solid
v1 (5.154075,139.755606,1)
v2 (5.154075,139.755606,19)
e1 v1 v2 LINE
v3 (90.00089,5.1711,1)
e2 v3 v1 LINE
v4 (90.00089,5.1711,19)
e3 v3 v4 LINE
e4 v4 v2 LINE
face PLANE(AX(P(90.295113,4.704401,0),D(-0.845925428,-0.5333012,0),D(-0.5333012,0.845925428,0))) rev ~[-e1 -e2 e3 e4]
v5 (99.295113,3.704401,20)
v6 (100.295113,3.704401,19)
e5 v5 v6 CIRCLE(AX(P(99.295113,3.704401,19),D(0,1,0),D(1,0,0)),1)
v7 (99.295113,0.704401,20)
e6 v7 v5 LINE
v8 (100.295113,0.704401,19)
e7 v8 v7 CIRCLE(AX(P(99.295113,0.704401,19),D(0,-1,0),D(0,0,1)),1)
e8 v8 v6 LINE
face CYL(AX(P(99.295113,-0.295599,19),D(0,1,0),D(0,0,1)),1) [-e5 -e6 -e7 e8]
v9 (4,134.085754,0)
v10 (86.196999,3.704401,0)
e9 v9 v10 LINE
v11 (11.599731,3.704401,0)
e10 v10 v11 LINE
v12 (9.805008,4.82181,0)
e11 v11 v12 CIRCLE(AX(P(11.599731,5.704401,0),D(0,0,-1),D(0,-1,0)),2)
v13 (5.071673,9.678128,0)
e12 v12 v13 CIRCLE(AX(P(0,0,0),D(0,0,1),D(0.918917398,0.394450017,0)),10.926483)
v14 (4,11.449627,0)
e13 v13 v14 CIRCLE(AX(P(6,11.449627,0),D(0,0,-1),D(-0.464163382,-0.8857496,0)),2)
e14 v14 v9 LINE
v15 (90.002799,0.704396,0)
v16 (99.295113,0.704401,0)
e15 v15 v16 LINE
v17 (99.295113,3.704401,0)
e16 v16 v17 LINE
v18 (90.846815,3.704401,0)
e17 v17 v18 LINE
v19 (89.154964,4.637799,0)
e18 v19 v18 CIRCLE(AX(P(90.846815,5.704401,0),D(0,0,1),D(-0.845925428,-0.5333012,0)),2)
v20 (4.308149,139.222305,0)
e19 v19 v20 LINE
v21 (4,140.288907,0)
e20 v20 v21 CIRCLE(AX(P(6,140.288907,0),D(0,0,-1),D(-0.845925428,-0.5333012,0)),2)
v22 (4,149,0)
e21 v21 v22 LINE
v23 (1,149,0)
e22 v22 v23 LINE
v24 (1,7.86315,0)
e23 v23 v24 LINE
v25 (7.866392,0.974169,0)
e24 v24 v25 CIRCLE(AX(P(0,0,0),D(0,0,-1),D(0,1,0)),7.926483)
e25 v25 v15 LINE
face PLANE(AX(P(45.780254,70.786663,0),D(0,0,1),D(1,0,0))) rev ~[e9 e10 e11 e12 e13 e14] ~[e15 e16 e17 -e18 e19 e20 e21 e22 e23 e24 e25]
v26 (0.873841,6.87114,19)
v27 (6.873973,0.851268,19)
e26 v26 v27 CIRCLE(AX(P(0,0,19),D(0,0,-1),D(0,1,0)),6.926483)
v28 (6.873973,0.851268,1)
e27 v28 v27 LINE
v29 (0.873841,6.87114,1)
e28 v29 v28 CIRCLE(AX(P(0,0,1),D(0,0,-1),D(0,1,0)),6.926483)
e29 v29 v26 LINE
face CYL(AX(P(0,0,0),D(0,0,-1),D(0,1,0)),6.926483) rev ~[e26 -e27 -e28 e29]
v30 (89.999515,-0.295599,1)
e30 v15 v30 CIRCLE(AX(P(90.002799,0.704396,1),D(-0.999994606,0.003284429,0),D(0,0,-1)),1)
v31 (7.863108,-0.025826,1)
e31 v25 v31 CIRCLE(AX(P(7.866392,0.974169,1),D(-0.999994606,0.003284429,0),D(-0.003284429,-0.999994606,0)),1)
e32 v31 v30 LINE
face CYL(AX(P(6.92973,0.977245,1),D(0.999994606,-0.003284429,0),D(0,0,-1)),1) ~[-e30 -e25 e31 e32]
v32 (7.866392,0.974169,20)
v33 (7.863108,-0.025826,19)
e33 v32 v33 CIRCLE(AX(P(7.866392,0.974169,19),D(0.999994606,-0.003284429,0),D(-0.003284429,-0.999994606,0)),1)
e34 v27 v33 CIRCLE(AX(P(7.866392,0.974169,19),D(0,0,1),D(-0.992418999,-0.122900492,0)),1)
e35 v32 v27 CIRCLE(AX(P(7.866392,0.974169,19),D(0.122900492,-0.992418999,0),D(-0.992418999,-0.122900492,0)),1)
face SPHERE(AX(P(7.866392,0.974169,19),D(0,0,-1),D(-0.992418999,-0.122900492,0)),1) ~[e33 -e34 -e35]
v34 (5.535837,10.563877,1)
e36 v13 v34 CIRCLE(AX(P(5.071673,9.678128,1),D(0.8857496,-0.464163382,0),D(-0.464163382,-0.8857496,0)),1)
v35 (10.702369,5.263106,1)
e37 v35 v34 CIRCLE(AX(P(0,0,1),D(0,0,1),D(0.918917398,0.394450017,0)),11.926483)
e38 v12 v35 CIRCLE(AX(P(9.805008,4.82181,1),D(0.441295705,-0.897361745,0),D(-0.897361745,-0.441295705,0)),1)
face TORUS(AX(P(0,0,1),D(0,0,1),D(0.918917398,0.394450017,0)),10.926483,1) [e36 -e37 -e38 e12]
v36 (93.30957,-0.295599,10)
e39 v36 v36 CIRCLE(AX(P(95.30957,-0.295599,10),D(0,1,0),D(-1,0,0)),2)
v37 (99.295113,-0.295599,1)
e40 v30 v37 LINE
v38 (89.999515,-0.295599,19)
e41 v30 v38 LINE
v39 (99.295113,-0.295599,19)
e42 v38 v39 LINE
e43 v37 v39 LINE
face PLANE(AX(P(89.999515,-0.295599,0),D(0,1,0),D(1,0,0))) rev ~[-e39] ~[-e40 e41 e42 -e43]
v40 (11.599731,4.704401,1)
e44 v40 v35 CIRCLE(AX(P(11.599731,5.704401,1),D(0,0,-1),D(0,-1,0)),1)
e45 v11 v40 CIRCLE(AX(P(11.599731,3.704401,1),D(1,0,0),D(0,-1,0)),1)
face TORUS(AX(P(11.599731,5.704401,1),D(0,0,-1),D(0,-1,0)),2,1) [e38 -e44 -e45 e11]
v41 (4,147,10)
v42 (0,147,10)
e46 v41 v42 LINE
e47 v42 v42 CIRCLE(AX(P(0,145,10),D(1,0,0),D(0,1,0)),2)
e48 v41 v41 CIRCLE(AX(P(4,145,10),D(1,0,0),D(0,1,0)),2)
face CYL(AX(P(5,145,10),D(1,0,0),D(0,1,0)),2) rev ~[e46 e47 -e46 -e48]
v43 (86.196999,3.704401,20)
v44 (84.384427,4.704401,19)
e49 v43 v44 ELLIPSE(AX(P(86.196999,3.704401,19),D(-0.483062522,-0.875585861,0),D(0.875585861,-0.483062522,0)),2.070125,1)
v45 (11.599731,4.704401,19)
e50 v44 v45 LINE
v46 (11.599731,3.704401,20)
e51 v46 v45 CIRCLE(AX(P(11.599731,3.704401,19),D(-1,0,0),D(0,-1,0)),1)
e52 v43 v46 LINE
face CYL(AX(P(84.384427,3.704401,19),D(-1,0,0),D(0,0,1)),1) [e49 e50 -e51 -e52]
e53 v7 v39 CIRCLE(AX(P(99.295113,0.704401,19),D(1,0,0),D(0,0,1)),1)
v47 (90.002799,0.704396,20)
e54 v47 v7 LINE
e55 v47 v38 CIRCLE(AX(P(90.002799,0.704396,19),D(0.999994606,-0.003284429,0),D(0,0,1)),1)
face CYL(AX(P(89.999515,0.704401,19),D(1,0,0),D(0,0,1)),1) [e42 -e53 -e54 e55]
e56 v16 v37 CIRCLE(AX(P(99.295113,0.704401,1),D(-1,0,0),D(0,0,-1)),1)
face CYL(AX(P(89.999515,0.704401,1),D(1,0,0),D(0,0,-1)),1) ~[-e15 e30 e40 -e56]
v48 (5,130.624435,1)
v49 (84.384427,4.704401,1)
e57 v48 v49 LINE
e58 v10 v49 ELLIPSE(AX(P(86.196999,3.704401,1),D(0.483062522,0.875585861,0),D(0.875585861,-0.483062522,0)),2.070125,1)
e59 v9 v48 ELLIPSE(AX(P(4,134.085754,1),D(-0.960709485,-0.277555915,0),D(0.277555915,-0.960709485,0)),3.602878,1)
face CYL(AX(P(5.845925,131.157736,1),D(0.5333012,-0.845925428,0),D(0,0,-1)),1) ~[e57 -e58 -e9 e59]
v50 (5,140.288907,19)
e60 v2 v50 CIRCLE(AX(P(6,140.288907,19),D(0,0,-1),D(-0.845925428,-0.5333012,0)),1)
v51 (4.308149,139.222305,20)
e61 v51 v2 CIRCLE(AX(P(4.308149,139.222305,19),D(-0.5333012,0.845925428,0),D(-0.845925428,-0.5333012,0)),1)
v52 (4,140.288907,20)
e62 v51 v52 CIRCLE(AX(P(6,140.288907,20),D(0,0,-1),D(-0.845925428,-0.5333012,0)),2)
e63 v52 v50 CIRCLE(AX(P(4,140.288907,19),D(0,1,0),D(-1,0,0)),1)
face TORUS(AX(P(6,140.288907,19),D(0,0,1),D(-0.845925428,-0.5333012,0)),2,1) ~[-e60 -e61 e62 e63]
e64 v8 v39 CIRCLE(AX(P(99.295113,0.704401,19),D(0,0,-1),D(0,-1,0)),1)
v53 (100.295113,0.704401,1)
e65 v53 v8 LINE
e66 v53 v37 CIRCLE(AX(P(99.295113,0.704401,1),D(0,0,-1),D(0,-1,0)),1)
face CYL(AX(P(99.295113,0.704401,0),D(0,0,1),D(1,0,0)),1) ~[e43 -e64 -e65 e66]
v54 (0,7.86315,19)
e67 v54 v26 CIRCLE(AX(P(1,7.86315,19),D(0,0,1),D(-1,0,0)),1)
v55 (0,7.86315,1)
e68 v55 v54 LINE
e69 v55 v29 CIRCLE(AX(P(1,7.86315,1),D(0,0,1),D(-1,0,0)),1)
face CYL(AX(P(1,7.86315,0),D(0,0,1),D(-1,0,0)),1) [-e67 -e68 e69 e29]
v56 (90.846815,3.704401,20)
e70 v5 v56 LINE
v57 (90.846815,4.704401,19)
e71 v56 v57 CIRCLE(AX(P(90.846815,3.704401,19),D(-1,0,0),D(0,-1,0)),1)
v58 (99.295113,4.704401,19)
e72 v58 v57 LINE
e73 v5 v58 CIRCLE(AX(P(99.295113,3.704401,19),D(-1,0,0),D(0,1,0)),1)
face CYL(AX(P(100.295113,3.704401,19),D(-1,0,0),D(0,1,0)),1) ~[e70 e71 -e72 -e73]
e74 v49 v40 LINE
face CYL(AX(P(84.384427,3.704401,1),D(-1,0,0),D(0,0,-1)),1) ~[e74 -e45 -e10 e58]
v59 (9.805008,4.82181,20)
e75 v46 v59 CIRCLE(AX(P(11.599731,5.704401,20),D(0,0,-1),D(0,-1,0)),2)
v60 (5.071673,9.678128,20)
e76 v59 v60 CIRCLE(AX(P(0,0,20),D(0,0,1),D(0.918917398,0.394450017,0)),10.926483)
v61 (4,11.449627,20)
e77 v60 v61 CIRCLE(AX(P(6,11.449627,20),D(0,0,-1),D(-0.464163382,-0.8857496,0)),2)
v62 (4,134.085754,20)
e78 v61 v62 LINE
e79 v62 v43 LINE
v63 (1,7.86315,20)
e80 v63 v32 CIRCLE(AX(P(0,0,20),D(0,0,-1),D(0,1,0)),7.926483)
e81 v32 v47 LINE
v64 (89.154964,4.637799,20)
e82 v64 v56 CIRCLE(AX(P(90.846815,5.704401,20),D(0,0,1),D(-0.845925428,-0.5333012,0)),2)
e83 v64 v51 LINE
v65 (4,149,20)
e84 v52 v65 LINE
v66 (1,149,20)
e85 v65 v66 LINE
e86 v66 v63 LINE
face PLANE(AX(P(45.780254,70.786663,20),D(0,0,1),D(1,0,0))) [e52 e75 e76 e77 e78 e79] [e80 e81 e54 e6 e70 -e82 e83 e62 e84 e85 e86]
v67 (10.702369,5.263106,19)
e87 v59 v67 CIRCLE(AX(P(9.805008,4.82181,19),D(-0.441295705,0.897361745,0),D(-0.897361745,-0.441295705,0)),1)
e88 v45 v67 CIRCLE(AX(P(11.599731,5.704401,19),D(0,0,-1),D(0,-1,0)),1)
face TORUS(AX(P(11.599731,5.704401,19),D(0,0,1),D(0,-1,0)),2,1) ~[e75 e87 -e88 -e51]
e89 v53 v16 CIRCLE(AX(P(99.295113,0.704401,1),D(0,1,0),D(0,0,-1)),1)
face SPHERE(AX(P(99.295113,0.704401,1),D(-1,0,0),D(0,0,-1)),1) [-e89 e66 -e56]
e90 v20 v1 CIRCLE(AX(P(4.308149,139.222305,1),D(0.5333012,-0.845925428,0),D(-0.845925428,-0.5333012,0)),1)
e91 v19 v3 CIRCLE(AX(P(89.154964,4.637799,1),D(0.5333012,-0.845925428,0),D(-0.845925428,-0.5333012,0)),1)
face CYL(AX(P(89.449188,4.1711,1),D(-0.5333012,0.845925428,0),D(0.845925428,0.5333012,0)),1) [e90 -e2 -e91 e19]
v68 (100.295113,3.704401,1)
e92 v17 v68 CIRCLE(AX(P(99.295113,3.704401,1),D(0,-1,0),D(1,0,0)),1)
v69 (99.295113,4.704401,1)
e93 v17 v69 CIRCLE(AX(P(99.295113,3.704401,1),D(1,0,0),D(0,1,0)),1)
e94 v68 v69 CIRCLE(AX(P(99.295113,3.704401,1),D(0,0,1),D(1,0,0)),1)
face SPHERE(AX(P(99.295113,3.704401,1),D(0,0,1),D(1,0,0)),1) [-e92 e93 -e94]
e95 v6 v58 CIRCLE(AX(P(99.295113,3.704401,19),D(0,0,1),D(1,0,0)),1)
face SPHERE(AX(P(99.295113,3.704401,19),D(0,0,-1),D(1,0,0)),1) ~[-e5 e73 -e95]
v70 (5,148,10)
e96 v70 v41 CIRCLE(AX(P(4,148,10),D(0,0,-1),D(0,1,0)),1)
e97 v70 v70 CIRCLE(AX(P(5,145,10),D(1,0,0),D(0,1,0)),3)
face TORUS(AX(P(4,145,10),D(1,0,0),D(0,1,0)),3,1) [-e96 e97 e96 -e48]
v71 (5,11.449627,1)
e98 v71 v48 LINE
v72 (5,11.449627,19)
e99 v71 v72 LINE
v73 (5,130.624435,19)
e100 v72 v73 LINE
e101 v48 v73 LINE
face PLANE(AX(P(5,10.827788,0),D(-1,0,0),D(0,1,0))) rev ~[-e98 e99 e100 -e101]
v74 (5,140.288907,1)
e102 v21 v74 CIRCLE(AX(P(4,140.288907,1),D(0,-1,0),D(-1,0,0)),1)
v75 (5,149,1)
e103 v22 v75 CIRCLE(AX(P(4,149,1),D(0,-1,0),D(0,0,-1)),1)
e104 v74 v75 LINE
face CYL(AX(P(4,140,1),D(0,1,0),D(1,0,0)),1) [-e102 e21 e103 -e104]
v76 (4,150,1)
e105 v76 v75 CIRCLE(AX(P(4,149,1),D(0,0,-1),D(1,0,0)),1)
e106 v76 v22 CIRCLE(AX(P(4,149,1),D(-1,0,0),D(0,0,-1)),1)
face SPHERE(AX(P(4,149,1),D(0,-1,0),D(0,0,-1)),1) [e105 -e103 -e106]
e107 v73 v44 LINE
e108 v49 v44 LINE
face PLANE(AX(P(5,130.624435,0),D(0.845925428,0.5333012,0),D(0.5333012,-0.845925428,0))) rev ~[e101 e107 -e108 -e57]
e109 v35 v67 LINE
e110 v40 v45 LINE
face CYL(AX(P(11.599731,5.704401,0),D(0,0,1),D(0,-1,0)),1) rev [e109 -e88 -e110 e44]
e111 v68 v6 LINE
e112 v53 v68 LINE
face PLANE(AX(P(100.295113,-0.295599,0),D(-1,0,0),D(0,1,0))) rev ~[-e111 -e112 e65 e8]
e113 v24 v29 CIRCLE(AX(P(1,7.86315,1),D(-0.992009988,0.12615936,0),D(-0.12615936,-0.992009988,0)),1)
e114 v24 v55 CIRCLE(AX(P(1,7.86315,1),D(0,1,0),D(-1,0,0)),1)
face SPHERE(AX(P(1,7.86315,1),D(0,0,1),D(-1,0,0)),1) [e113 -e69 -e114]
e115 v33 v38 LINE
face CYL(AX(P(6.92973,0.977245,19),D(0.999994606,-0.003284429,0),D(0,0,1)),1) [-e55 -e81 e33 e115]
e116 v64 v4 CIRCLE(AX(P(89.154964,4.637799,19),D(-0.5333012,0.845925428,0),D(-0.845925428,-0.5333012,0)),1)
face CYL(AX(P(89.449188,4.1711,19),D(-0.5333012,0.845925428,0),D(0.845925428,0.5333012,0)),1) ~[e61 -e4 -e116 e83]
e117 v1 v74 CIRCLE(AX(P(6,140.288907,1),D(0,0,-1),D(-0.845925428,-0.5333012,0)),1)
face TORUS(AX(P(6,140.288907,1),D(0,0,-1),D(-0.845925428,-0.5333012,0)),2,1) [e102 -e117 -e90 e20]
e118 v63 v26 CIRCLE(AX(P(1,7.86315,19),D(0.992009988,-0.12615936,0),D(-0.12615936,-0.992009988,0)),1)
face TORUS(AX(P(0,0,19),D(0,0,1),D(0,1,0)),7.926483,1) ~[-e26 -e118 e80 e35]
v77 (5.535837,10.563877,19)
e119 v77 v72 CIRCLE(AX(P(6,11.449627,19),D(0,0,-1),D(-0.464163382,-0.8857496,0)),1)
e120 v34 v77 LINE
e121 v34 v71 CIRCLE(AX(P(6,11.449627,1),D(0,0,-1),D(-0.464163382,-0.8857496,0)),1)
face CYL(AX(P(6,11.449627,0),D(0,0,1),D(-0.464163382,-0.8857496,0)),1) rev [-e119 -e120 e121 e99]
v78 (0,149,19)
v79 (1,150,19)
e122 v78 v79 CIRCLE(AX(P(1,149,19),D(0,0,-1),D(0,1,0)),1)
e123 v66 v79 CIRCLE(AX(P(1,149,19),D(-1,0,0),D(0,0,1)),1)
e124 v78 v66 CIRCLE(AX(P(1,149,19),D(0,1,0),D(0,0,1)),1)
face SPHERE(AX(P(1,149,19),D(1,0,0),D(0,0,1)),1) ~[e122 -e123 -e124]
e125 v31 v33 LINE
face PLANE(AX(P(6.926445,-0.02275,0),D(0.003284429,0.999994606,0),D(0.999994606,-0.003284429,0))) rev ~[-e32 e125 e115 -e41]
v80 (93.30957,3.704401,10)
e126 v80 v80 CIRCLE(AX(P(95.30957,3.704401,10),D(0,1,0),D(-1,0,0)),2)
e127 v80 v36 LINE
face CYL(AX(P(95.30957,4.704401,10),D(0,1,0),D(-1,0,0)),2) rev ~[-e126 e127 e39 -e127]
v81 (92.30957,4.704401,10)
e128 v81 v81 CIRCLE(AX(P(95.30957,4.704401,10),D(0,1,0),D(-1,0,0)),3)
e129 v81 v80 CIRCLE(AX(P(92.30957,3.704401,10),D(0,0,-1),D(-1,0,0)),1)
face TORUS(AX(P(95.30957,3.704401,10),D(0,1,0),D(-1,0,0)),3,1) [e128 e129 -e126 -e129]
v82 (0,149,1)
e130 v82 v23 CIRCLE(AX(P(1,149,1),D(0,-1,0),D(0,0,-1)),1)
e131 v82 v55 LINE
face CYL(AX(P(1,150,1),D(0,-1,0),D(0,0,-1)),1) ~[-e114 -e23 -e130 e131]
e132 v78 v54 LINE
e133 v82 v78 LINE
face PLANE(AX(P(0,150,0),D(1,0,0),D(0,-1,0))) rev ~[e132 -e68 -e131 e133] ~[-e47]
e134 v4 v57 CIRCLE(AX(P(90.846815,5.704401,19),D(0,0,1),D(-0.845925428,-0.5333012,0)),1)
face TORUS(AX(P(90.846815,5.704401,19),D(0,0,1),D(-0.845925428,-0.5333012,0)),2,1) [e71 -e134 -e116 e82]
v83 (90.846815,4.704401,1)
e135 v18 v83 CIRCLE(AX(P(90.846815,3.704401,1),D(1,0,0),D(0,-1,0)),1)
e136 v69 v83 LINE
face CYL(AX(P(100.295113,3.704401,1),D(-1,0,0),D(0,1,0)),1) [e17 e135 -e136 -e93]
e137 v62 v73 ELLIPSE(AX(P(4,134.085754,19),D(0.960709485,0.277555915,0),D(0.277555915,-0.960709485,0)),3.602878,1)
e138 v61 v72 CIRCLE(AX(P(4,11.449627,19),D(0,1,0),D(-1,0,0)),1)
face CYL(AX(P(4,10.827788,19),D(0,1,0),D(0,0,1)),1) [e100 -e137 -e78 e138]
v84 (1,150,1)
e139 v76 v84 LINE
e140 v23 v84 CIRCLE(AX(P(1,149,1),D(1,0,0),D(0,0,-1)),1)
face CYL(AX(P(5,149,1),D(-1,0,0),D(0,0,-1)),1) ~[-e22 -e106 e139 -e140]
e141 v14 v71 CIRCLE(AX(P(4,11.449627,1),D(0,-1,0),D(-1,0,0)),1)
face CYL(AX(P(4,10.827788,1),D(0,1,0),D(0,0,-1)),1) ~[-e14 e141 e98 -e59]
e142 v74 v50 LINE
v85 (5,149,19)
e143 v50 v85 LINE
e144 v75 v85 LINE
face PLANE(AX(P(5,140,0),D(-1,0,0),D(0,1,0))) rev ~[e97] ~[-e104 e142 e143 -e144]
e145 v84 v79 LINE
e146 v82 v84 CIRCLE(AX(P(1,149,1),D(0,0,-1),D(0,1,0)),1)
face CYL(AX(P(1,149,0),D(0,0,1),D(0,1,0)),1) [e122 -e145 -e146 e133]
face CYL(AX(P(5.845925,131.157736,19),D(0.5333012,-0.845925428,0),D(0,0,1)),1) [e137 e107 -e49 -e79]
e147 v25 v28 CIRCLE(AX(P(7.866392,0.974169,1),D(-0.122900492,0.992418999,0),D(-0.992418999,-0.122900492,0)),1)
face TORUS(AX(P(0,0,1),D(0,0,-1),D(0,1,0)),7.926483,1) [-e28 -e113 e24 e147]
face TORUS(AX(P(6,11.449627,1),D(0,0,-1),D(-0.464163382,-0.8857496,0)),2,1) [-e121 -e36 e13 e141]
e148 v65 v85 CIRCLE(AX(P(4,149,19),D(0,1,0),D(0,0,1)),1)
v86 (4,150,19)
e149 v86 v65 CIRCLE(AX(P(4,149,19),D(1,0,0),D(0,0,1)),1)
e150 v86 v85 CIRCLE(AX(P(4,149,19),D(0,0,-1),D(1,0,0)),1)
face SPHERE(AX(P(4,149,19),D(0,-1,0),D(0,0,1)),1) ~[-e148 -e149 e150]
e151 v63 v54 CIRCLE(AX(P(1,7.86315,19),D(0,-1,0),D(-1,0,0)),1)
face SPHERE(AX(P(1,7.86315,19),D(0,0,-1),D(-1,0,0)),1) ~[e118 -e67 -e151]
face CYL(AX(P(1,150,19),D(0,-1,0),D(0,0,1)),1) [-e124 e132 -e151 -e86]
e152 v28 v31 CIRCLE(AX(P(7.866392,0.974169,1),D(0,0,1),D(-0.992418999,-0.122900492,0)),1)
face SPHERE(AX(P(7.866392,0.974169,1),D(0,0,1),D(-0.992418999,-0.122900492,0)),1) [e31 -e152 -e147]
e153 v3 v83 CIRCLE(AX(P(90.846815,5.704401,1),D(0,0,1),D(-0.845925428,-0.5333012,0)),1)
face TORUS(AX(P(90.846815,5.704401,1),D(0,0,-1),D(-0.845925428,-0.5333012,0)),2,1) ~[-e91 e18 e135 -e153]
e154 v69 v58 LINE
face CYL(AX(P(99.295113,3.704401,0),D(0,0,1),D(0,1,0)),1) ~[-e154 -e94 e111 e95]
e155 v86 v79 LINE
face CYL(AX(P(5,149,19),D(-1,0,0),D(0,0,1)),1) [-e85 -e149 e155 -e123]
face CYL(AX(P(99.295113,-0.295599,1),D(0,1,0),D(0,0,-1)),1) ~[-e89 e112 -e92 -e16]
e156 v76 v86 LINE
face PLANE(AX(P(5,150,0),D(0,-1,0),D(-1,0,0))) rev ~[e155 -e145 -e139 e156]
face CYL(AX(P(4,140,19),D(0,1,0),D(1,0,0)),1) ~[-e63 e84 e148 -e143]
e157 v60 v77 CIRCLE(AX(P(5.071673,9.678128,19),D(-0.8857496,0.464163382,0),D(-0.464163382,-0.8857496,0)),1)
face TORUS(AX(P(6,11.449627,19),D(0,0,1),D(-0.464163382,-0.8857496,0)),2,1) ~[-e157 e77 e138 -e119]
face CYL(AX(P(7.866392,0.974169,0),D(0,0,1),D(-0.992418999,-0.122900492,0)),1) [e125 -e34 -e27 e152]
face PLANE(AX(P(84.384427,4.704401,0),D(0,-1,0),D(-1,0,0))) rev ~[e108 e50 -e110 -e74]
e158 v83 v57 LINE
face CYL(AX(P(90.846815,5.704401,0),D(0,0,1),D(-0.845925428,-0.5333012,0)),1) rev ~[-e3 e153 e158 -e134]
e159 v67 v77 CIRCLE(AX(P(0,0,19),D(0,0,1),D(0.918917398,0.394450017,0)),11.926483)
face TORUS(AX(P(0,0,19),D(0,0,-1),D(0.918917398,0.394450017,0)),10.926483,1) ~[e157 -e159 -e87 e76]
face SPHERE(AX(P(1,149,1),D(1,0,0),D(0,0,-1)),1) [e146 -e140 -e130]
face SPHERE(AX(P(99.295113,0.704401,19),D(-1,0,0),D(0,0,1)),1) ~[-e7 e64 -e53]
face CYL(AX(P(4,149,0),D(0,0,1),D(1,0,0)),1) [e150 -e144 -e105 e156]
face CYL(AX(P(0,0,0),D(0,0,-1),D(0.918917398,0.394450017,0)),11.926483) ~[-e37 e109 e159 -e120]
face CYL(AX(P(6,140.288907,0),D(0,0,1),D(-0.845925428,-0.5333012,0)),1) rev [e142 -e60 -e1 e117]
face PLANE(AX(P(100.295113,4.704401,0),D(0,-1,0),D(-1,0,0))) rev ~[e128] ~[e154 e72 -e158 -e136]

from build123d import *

# Parameters (mm, degrees)
F1_DEPTH = 20
F2_R     = 2
F3_DEPTH = 25
F4_R     = 2
F5_DEPTH = 25
F6_R     = 1


# Not quite as in the source:
# - a feature names something its author has since deleted; it is built from what else it names


with BuildPart() as f1:
    # F0 (on Top) → F1 (new body)
    with BuildSketch(Plane.XY):
        Polygon((84.3844267085, 4.7044013627), (90.2951131996, 4.7044013627), (5, 140), (5, 130.6244351268), align=None)
        with BuildLine():
            Line((100.2951131996, 4.7044013627), (90.2951131996, 4.7044013627))
            Line((90.2951131996, 4.7044013627), (84.3844267085, 4.7044013627))
            Line((84.3844267085, 4.7044013627), (10.95945259, 4.7044013627))
            ThreePointArc((10.95945259, 4.7044013627), (8.5469291421, 8.3181124958), (5, 10.8277880129))
            Line((5, 10.8277880129), (5, 130.6244351268))
            Line((5, 130.6244351268), (5, 140))
            Line((5, 140), (5, 150))
            Line((5, 150), (0, 150))
            Line((0, 150), (0, 6.9264828534))
            ThreePointArc((0, 6.9264828534), (4.9057995801, 4.8897132021), (6.9264454937, -0.0227495433))
            Line((6.9264454937, -0.0227495433), (89.9995145623, -0.2955986373))
            Line((89.9995145623, -0.2955986373), (100.2951131996, -0.2955986373))
            Line((100.2951131996, -0.2955986373), (100.2951131996, 4.7044013627))
        make_face()
    extrude(amount=F1_DEPTH)

    # F2 (on face) → F3 (cut)
    with BuildSketch(Plane.YZ.offset(5)):
        with Locations((145, 10)):
            Circle(F2_R)
    extrude(amount=-F3_DEPTH, mode=Mode.SUBTRACT)

    # F4 (on face) → F5 (cut)
    with BuildSketch(Plane(origin=(0, 4.7044013627, 0), x_dir=(-1, 0, 0), z_dir=(0, 1, 0))):
        with Locations((-95.3095704317, 10)):
            Circle(F4_R)
    extrude(amount=-F5_DEPTH, mode=Mode.SUBTRACT)

    # F6
    f6_edges = [f1.edges().sort_by_distance(p)[0] for p in [
        (100.295113, 4.704401, 10),
        (47.647557, 72.352201, 20),
        (5, 145, 20),
        (2.5, 150, 20),
        (0, 78.463241, 20),
        (4.9058, 4.889713, 20),
        (48.46298, -0.159174, 20),
        (95.147314, -0.295599, 20),
        (100.295113, 2.204401, 20),
        (95.295113, 4.704401, 20),
        (44.692213, 67.664418, 20),
        (47.67194, 4.704401, 20),
        (8.546929, 8.318112, 20),
        (5, 70.726112, 20),
        (47.647557, 72.352201, 0),
        (5, 145, 0),
        (2.5, 150, 0),
        (0, 78.463241, 0),
        (4.9058, 4.889713, 0),
        (48.46298, -0.159174, 0),
        (95.147314, -0.295599, 0),
        (100.295113, 2.204401, 0),
        (95.295113, 4.704401, 0),
        (44.692213, 67.664418, 0),
        (47.67194, 4.704401, 0),
        (8.546929, 8.318112, 0),
        (5, 70.726112, 0),
        (5, 143, 10),
        (97.30957, 4.704401, 10),
        (90.295113, 4.704401, 10),
        (5, 140, 10),
        (5, 150, 10),
        (6.926445, -0.02275, 10),
        (0, 6.926483, 10),
        (5, 10.827788, 10),
        (10.959453, 4.704401, 10),
        (100.295113, -0.295599, 10),
        (0, 150, 10),
    ]]
    fillet(f6_edges, radius=F6_R)


solid = f1.part
